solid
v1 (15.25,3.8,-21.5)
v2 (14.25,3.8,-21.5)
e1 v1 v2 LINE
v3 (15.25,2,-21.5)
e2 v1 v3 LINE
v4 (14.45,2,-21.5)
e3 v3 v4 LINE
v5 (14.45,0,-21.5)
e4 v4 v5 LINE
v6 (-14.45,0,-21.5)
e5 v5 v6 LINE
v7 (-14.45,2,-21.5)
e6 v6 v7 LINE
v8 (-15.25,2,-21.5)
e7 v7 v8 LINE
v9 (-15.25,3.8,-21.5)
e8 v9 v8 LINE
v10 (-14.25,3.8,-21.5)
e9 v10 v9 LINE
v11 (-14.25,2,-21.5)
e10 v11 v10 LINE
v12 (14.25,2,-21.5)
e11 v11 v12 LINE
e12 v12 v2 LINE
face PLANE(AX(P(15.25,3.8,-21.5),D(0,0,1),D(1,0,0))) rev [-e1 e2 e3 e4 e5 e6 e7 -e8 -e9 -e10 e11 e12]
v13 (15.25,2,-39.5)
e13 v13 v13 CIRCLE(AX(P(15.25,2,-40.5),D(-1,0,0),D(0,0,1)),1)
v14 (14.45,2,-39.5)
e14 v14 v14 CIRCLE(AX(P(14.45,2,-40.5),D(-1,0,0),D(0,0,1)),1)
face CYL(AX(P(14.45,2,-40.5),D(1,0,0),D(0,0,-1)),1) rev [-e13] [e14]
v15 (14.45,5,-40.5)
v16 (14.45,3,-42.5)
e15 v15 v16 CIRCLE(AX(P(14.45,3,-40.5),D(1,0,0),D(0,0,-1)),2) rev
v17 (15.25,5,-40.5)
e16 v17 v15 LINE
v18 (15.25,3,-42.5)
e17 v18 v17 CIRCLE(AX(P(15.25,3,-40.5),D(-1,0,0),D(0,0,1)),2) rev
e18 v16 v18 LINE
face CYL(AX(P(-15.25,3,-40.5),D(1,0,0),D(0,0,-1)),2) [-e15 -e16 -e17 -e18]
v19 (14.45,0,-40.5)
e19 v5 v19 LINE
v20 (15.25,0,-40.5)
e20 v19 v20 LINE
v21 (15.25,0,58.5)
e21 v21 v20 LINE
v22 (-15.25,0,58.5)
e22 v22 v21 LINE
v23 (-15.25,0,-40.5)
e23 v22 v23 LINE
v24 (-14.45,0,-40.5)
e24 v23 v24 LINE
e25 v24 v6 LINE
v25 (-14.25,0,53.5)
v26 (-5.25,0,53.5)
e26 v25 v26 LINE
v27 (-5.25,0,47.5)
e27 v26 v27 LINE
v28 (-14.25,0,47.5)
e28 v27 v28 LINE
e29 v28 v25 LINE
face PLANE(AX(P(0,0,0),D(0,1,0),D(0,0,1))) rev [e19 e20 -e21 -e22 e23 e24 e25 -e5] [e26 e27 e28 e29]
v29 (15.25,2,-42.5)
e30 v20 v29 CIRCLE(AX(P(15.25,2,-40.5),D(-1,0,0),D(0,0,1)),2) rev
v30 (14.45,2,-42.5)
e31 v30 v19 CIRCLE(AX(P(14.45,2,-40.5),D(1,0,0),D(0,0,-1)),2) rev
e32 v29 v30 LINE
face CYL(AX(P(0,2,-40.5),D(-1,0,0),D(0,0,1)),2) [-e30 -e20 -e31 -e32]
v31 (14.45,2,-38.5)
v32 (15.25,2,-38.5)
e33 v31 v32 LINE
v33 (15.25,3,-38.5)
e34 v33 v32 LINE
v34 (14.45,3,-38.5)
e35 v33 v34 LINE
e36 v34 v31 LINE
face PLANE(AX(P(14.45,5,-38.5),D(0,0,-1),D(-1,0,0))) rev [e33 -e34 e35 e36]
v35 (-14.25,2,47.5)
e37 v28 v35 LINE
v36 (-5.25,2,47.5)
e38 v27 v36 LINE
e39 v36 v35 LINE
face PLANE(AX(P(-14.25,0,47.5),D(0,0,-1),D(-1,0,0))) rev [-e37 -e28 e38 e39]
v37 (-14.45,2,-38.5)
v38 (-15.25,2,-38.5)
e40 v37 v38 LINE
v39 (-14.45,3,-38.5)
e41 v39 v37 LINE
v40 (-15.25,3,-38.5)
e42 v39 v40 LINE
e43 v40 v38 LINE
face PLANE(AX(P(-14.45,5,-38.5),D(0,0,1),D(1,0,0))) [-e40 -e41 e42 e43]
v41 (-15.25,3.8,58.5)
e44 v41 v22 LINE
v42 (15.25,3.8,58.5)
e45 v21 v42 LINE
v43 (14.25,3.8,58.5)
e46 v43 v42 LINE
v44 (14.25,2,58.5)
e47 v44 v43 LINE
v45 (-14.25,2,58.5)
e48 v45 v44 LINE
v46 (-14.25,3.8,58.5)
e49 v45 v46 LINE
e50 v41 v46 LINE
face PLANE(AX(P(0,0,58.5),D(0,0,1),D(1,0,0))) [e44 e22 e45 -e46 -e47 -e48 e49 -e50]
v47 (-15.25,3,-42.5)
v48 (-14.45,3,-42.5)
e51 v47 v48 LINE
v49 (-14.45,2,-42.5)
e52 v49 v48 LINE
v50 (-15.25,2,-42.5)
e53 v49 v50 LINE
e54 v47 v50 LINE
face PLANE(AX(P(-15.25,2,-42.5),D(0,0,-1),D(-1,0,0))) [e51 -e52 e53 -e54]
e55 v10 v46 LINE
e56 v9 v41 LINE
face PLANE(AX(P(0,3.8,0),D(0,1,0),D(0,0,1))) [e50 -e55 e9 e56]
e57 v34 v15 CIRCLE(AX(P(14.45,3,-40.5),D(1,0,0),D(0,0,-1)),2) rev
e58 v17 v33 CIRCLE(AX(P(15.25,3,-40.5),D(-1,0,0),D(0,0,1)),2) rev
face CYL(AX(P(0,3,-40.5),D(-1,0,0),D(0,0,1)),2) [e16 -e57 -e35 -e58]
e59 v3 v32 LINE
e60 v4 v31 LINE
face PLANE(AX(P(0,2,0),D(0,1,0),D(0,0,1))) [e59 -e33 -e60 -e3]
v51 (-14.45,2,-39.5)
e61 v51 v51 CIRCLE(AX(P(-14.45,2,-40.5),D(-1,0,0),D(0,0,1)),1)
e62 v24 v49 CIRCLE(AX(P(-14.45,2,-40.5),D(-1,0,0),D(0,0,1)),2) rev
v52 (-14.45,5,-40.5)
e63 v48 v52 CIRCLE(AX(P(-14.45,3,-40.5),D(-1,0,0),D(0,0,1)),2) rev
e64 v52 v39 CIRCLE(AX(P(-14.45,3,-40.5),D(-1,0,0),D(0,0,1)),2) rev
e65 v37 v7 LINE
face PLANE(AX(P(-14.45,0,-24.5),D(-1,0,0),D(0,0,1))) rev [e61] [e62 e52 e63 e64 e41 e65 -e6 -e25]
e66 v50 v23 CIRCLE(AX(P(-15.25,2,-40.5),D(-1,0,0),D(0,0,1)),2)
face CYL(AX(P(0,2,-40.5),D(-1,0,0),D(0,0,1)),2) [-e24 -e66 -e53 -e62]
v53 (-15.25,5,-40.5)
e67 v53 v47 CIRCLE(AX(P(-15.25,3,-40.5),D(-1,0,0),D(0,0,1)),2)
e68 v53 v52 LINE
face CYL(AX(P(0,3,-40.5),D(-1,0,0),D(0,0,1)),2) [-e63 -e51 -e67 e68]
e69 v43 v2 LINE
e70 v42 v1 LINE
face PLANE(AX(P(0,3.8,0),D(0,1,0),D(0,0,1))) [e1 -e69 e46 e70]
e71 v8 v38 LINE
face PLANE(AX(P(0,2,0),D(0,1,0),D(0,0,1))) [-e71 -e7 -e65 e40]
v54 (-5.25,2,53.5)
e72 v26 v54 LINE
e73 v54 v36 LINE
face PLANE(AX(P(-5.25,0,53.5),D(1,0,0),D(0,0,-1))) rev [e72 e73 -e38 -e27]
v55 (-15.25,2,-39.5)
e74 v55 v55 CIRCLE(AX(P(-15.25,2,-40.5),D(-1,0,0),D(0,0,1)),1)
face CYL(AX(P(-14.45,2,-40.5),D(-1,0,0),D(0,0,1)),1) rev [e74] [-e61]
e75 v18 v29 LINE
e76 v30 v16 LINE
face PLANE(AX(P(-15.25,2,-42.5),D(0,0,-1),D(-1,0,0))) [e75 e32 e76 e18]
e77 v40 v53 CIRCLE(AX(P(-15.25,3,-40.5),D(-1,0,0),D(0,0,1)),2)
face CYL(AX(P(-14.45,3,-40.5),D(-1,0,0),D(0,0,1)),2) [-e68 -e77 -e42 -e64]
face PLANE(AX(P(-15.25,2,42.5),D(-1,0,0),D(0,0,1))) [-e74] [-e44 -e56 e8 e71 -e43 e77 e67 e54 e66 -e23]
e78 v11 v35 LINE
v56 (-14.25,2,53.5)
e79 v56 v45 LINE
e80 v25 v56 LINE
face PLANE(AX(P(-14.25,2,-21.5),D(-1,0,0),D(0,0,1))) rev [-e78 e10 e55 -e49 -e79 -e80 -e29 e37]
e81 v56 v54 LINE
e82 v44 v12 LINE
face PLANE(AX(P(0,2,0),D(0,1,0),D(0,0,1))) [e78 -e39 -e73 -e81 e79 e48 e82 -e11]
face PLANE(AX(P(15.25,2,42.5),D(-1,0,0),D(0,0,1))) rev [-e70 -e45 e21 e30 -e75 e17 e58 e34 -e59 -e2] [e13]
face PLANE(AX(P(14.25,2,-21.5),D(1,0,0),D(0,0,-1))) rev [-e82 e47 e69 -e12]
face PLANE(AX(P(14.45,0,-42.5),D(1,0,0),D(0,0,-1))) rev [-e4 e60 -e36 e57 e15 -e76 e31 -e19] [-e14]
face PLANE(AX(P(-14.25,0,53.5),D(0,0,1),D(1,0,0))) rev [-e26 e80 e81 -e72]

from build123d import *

# Parameters (mm, degrees)
SKETCH1_W           = 30.5
SKETCH1_H           = 85
BOSS_EXTRUDE1_DEPTH = 2
CUT_EXTRUDE1_DEPTH  = 2
SKETCH5_W           = 0.8
SKETCH5_H           = 4
BOSS_EXTRUDE2_DEPTH = 3
SKETCH6_R           = 1
CUT_EXTRUDE2_DEPTH  = 0.8
FILLET1_R           = 2
FILLET2_R           = 2
SKETCH7_W           = 30.5
SKETCH7_H           = 2
BOSS_EXTRUDE3_DEPTH = 16
SKETCH8_W           = 30.5
SKETCH8_H           = 80
BOSS_EXTRUDE4_DEPTH = 1.8
SKETCH9_W           = 28.5
SKETCH9_H           = 80
CUT_EXTRUDE3_DEPTH  = 1.8
SKETCH10_W          = 28.9
SKETCH10_H          = 2
CUT_EXTRUDE4_DEPTH  = 1
SKETCH11_W          = 9
SKETCH11_H          = 6
CUT_EXTRUDE5_DEPTH  = 2


with BuildPart() as part:
    # Sketch1 → Boss-Extrude1 (new body)
    with BuildSketch(Plane(origin=(0, 0, 0), x_dir=(1, 0, 0), z_dir=(0, 1, 0))):
        Rectangle(SKETCH1_W, SKETCH1_H)
    extrude(amount=BOSS_EXTRUDE1_DEPTH)

    # Sketch2 → Cut-Extrude1 (cut)
    with BuildSketch(Plane(origin=(0, 2, 0), x_dir=(1, 0, 0), z_dir=(0, 1, 0))):
        Polygon((14.45, 42.5), (-14.45, 42.5), (-14.45, 24.5), (-14.45, 22.5), (14.45, 22.5), (14.45, 24.5), align=None)
    extrude(amount=-CUT_EXTRUDE1_DEPTH, mode=Mode.SUBTRACT)

    # Sketch5 → Boss-Extrude2 (add)
    with BuildSketch(Plane(origin=(0, 2, 0), x_dir=(1, 0, 0), z_dir=(0, 1, 0))):
        with Locations((-14.85, 40.5)):
            Rectangle(SKETCH5_W, SKETCH5_H)
    boss_extrude2 = extrude(amount=BOSS_EXTRUDE2_DEPTH)

    # Sketch6 → Cut-Extrude2 (cut)
    with BuildSketch(Plane.ZY.offset(15.25)):
        with Locations((-40.5, 2)):
            Circle(SKETCH6_R)
    cut_extrude2 = extrude(amount=-CUT_EXTRUDE2_DEPTH, mode=Mode.SUBTRACT)

    # Mirror1: Boss-Extrude2, Cut-Extrude2 across plane
    add(boss_extrude2.mirror(Plane(origin=(0, 0, 0), x_dir=(0, 0, 1), z_dir=(1, 0, 0))))
    add(cut_extrude2.mirror(Plane(origin=(0, 0, 0), x_dir=(0, 0, 1), z_dir=(1, 0, 0))), mode=Mode.SUBTRACT)

    # Fillet1
    fillet1_edges = [part.edges().sort_by_distance(p)[0] for p in [
        (-14.85, 0, -42.5),
        (-14.85, 5, -42.5),
        (-14.85, 5, -38.5),
    ]]
    fillet(fillet1_edges, radius=FILLET1_R - 0.0001)  # a hair under: the kernel refuses the full size

    # Fillet2
    fillet2_edges = [part.edges().sort_by_distance(p)[0] for p in [
        (14.85, 0, -42.5),
        (14.85, 5, -38.5),
        (14.85, 5, -42.5),
    ]]
    fillet(fillet2_edges, radius=FILLET2_R - 0.0001)  # a hair under: the kernel refuses the full size

    # Sketch7 → Boss-Extrude3 (add)
    with BuildSketch(Plane.XY.offset(42.5)):
        with Locations((0, 1)):
            Rectangle(SKETCH7_W, SKETCH7_H)
    extrude(amount=BOSS_EXTRUDE3_DEPTH)

    # Sketch8 → Boss-Extrude4 (add)
    with BuildSketch(Plane(origin=(0, 2, 0), x_dir=(1, 0, 0), z_dir=(0, 1, 0))):
        with Locations((0, -18.5)):
            Rectangle(SKETCH8_W, SKETCH8_H)
    extrude(amount=BOSS_EXTRUDE4_DEPTH)

    # Sketch9 → Cut-Extrude3 (cut)
    with BuildSketch(Plane(origin=(0, 3.8, 0), x_dir=(1, 0, 0), z_dir=(0, 1, 0))):
        with Locations((0, -18.5)):
            Rectangle(SKETCH9_W, SKETCH9_H)
    extrude(amount=-CUT_EXTRUDE3_DEPTH, mode=Mode.SUBTRACT)

    # Sketch10 → Cut-Extrude4 (cut)
    with BuildSketch(Plane(origin=(0, 0, -22.5), x_dir=(-1, 0, 0), z_dir=(0, 0, -1))):
        with Locations((0, 1)):
            Rectangle(SKETCH10_W, SKETCH10_H)
    extrude(amount=-CUT_EXTRUDE4_DEPTH, mode=Mode.SUBTRACT)

    # Sketch11 → Cut-Extrude5 (cut)
    with BuildSketch(Plane(origin=(0, 2, 0), x_dir=(1, 0, 0), z_dir=(0, 1, 0))):
        with Locations((-9.75, -50.5)):
            Rectangle(SKETCH11_W, SKETCH11_H)
    extrude(amount=-CUT_EXTRUDE5_DEPTH, mode=Mode.SUBTRACT)


solid = part.part
